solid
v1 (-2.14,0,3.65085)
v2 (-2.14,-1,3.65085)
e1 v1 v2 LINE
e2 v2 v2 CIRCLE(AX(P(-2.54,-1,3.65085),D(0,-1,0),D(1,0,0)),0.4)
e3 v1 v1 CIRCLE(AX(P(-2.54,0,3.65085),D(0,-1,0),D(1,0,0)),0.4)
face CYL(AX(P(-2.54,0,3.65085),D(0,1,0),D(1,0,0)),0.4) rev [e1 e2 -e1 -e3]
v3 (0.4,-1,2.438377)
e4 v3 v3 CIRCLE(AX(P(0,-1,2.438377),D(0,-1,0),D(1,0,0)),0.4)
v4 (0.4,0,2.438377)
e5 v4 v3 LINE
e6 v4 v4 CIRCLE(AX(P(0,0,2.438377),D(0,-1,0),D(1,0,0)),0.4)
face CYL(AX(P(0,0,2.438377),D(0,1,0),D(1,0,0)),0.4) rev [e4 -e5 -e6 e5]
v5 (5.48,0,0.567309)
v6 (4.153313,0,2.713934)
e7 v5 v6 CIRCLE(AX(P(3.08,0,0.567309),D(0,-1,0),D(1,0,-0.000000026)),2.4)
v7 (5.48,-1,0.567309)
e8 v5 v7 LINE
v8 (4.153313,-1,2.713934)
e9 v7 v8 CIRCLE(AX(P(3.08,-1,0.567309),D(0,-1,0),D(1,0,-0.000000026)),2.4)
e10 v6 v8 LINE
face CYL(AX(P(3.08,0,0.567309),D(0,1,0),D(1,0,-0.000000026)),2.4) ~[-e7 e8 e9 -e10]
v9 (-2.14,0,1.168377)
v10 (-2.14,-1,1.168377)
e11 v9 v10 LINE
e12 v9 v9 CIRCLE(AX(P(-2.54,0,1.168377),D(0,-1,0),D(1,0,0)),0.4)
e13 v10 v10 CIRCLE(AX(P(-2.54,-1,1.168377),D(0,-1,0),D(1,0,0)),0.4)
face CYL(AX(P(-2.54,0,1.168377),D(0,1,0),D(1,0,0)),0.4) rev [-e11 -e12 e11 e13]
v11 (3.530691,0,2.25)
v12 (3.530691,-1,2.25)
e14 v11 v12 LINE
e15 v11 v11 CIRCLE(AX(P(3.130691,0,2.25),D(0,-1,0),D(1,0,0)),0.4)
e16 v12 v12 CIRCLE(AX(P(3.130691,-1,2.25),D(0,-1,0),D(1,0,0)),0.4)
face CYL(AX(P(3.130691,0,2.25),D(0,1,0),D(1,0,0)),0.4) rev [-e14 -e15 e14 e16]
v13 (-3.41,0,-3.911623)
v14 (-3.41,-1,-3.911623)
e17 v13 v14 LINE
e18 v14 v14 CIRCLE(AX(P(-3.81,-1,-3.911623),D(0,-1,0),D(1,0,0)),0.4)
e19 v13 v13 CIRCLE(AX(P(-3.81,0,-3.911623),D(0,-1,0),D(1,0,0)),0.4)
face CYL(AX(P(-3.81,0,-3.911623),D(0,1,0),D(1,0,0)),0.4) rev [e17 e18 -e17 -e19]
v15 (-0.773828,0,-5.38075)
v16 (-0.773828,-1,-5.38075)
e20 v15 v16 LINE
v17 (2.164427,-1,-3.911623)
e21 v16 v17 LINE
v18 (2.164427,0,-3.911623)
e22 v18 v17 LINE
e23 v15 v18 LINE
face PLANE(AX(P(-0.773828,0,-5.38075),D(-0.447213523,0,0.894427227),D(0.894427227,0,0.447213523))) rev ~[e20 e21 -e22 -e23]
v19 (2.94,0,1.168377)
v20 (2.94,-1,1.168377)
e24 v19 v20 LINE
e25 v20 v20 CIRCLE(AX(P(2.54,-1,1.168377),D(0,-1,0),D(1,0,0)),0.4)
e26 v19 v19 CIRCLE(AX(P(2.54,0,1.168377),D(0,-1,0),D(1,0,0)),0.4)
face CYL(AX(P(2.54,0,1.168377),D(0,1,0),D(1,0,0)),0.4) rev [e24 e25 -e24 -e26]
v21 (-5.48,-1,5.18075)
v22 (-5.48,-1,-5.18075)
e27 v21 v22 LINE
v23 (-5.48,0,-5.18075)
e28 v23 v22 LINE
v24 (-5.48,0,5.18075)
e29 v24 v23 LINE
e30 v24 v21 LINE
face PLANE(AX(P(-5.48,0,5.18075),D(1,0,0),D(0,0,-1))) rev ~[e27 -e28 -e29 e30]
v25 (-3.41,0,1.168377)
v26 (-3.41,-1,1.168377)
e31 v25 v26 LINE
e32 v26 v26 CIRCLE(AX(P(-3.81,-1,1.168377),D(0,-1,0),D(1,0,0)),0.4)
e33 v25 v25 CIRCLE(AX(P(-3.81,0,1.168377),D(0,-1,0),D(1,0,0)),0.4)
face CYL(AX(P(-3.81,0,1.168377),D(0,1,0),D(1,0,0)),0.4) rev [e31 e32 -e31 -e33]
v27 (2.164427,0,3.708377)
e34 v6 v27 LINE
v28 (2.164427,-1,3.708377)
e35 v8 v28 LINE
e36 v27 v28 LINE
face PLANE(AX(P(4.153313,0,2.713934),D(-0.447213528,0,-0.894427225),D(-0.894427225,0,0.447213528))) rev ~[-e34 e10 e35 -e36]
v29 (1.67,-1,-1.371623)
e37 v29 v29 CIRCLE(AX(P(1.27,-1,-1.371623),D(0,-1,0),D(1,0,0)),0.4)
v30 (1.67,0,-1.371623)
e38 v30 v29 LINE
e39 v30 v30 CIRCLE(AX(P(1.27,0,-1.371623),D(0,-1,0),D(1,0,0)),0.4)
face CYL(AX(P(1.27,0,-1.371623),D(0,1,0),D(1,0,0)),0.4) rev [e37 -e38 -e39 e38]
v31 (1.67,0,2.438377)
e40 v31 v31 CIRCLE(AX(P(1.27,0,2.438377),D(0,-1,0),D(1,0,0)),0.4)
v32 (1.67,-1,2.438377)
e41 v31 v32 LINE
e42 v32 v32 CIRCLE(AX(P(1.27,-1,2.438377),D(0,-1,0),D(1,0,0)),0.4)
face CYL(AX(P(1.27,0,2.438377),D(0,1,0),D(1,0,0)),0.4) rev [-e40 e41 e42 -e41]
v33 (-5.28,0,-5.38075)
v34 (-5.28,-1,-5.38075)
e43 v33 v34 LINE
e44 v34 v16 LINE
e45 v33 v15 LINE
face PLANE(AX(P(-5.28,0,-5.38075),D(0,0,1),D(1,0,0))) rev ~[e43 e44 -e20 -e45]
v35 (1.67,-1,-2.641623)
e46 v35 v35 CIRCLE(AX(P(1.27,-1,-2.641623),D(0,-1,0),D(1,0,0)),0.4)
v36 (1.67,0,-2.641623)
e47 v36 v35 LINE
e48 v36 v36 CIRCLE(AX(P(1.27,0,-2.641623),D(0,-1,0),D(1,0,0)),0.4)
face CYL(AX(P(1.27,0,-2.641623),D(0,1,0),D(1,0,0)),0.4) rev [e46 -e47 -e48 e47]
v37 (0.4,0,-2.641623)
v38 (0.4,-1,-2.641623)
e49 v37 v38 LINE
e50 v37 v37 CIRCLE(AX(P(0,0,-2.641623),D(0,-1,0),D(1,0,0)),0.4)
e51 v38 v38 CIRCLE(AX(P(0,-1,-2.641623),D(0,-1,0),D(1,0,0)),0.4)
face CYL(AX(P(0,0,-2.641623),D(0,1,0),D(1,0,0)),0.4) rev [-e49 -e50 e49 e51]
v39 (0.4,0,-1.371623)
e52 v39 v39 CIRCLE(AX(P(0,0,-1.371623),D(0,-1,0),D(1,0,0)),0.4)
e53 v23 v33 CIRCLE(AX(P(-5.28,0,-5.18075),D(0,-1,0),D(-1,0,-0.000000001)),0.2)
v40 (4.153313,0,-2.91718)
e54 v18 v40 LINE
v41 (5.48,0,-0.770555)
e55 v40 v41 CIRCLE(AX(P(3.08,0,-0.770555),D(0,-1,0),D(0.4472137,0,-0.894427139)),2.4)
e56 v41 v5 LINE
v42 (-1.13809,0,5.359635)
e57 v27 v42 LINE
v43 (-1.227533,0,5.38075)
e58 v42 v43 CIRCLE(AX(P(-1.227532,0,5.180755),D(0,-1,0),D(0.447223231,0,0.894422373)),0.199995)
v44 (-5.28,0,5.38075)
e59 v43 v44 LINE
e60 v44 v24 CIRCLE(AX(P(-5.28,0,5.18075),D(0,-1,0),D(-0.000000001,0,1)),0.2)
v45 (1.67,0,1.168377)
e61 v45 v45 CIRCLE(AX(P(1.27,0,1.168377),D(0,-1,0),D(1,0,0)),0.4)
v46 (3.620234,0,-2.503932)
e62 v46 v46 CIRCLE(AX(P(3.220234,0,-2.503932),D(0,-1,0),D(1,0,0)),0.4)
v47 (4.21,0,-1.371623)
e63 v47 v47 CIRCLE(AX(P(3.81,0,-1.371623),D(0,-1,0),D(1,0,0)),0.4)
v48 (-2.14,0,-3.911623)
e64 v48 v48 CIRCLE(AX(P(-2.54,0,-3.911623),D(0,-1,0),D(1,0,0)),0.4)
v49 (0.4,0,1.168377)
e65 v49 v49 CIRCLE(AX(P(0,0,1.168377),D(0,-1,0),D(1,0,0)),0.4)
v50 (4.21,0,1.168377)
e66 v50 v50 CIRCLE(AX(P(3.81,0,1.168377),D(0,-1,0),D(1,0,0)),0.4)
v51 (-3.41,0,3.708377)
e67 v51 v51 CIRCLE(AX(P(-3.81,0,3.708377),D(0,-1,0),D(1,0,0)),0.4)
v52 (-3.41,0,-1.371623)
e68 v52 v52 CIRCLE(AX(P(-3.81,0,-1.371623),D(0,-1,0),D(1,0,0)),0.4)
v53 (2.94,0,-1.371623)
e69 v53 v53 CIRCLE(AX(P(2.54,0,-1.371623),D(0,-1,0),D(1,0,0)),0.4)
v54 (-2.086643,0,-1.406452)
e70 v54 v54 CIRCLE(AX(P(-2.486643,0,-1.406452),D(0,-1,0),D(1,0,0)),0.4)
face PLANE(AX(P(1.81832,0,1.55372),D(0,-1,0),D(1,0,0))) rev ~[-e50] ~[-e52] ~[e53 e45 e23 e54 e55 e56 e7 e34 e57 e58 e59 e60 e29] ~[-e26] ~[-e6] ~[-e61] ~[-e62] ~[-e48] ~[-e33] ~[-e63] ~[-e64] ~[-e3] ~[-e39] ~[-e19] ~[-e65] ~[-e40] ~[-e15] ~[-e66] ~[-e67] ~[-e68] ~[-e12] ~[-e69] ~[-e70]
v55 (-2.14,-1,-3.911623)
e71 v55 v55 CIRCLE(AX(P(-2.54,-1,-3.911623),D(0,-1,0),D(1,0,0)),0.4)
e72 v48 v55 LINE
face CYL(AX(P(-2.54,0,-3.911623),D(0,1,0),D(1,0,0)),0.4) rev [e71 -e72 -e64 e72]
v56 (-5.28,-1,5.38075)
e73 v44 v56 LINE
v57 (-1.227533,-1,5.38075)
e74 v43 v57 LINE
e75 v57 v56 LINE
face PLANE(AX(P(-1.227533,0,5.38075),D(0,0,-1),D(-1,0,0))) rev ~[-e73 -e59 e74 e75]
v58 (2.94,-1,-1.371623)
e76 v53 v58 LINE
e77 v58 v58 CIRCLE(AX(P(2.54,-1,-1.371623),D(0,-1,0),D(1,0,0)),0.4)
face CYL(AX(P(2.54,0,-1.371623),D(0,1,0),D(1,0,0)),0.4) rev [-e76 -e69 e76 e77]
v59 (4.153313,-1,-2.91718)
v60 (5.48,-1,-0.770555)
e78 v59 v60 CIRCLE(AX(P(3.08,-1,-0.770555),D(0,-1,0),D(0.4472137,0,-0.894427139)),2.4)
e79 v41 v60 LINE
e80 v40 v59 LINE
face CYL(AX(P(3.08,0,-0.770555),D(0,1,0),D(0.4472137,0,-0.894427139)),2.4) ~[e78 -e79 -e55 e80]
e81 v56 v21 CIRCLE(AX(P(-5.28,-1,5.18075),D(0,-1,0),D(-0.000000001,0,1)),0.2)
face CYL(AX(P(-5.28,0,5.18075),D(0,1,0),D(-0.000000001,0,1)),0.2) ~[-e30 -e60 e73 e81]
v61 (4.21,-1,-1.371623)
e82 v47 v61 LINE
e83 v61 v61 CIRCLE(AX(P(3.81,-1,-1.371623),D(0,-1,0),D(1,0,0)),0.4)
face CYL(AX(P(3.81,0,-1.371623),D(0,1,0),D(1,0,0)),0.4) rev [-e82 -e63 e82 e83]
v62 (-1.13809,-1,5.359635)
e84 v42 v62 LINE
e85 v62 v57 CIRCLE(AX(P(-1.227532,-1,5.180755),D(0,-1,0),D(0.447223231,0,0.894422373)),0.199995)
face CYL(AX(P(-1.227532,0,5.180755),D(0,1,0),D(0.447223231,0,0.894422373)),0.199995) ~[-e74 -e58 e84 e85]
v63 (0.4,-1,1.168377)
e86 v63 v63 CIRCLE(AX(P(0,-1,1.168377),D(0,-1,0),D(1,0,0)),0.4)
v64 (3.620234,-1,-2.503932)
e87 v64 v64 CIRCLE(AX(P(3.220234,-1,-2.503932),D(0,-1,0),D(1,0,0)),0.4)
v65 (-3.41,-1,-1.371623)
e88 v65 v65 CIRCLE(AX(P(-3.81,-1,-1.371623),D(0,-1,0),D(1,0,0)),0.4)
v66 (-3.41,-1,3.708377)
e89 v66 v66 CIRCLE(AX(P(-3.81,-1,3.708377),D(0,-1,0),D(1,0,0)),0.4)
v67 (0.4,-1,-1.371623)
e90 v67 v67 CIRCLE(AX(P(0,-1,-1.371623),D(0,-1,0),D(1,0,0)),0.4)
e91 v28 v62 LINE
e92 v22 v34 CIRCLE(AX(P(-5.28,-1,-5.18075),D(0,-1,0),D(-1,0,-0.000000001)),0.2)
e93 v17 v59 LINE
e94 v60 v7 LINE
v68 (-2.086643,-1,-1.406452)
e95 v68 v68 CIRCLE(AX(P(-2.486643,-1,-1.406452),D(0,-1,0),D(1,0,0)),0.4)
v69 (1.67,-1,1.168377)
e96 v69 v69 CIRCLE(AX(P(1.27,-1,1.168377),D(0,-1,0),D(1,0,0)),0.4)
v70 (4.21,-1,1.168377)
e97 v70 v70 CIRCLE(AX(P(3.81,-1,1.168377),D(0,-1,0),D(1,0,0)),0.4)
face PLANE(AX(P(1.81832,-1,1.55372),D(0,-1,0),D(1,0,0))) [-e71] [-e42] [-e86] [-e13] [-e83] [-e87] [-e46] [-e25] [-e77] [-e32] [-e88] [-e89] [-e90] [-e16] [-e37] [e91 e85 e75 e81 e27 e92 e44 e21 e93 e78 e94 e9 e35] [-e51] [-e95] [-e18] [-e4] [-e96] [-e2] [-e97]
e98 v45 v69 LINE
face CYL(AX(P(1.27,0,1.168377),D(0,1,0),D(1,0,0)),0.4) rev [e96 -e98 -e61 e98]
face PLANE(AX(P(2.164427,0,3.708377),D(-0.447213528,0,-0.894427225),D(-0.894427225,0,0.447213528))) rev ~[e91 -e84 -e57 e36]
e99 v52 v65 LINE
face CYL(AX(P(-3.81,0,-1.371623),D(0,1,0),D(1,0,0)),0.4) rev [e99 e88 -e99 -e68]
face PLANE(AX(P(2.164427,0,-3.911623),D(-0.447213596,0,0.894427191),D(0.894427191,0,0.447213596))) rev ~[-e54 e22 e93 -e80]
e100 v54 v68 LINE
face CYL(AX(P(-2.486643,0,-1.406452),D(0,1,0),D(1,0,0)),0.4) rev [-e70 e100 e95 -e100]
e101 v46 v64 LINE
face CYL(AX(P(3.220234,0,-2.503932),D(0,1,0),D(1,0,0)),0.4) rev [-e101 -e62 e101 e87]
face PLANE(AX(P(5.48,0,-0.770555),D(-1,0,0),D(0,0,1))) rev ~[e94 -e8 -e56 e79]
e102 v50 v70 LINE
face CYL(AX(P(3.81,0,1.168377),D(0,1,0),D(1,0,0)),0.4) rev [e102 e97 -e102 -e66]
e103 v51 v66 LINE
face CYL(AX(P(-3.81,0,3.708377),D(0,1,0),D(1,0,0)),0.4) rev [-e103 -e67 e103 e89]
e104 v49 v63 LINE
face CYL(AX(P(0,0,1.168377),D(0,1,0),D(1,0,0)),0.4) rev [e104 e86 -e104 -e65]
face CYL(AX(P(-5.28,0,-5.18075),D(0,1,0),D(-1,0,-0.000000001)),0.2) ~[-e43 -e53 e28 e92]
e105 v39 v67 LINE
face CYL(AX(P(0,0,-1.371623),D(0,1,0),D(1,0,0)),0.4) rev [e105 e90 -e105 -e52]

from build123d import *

# Parameters (mm, degrees)
F0_R     = 0.4
F0_W     = 4.21
F0_H     = 2.54
F1_DEPTH = 1


# Not quite as in the source:
# - ends of sketch curves that miss each other by under 0.0002 mm in the source are joined


with BuildPart() as f1:
    # F0 (on Front) → F1 (new body)
    with BuildSketch(Plane.XZ):
        with BuildLine():
            Line((4.153313, 2.713934), (2.1644269248, 3.7083768497))
            Line((2.1644269248, 3.7083768497), (-0.77, 3.708377))
            ThreePointArc((-0.77, 3.708377), (-1.1235533906, 3.5619303906), (-1.27, 3.208377))
            Line((-1.27, 3.208377), (-1.27, 2.438377))
            Line((-1.27, 2.438377), (-1.27, -0.101623))
            Line((-1.27, -0.101623), (5.48, -0.101623))
            Line((5.48, -0.101623), (5.48, 0.567309))
            ThreePointArc((5.48, 0.567309), (5.1215620576, 1.8290634789), (4.153313, 2.713934))
        make_face()
        with Locations((0, 1.168377)):
            Circle(F0_R, mode=Mode.SUBTRACT)
        with Locations((1.27, 1.168377)):
            Circle(F0_R, mode=Mode.SUBTRACT)
        with Locations((2.54, 1.168377)):
            Circle(F0_R, mode=Mode.SUBTRACT)
        with Locations((0, 2.438377)):
            Circle(F0_R, mode=Mode.SUBTRACT)
        with Locations((1.27, 2.438377)):
            Circle(F0_R, mode=Mode.SUBTRACT)
        with Locations((3.81, 1.168377)):
            Circle(F0_R, mode=Mode.SUBTRACT)
        with Locations((3.130691, 2.25)):
            Circle(F0_R, mode=Mode.SUBTRACT)
        with BuildLine():
            Line((2.1644269248, 3.7083768497), (-1.13809, 5.359635))
            ThreePointArc((-1.13809, 5.359635), (-1.1815821983, 5.3753997465), (-1.227533, 5.38075))
            Line((-1.227533, 5.38075), (-5.28, 5.38075))
            ThreePointArc((-5.28, 5.38075), (-5.4214213562, 5.3221713562), (-5.48, 5.18075))
            Line((-5.48, 5.18075), (-5.48, 2.438377))
            Line((-5.48, 2.438377), (-1.27, 2.438377))
            Line((-1.27, 2.438377), (-1.27, 3.208377))
            ThreePointArc((-1.27, 3.208377), (-1.1235533906, 3.5619303906), (-0.77, 3.708377))
            Line((-0.77, 3.708377), (2.1644269248, 3.7083768497))
        make_face()
        with Locations((-3.81, 3.708377)):
            Circle(F0_R, mode=Mode.SUBTRACT)
        with Locations((-2.54, 3.65085)):
            Circle(F0_R, mode=Mode.SUBTRACT)
        with Locations((-3.375, 1.168377)):
            Rectangle(F0_W, F0_H)
        with Locations((-3.81, 1.168377)):
            Circle(F0_R, mode=Mode.SUBTRACT)
        with Locations((-2.54, 1.168377)):
            Circle(F0_R, mode=Mode.SUBTRACT)
        with Locations((-3.375, -1.371623)):
            Rectangle(F0_W, F0_H)
        with Locations((-3.81, -1.371623)):
            Circle(F0_R, mode=Mode.SUBTRACT)
        with Locations((-2.486643, -1.406452)):
            Circle(F0_R, mode=Mode.SUBTRACT)
        with BuildLine():
            Line((-1.27, -3.411623), (-1.27, -2.641623))
            Line((-1.27, -2.641623), (-5.48, -2.641623))
            Line((-5.48, -2.641623), (-5.48, -5.18075))
            ThreePointArc((-5.48, -5.18075), (-5.4214213562, -5.3221713562), (-5.28, -5.38075))
            Line((-5.28, -5.38075), (-0.773828, -5.38075))
            Line((-0.773828, -5.38075), (2.1644269193, -3.9116228385))
            Line((2.1644269193, -3.9116228385), (-0.77, -3.911623))
            ThreePointArc((-0.77, -3.911623), (-1.1235533906, -3.7651763906), (-1.27, -3.411623))
        make_face()
        with Locations((-3.81, -3.911623)):
            Circle(F0_R, mode=Mode.SUBTRACT)
        with Locations((-2.54, -3.911623)):
            Circle(F0_R, mode=Mode.SUBTRACT)
        with BuildLine():
            Line((5.48, -0.770555), (5.48, -0.101623))
            Line((5.48, -0.101623), (-1.27, -0.101623))
            Line((-1.27, -0.101623), (-1.27, -2.641623))
            Line((-1.27, -2.641623), (-1.27, -3.411623))
            ThreePointArc((-1.27, -3.411623), (-1.1235533906, -3.7651763906), (-0.77, -3.911623))
            Line((-0.77, -3.911623), (2.164427, -3.911623))
            Line((2.164427, -3.911623), (4.153313, -2.91718))
            ThreePointArc((4.153313, -2.91718), (5.1215620576, -2.0323094789), (5.48, -0.770555))
        make_face()
        with Locations((0, -2.641623)):
            Circle(F0_R, mode=Mode.SUBTRACT)
        with Locations((1.27, -2.641623)):
            Circle(F0_R, mode=Mode.SUBTRACT)
        with Locations((0, -1.371623)):
            Circle(F0_R, mode=Mode.SUBTRACT)
        with Locations((1.27, -1.371623)):
            Circle(F0_R, mode=Mode.SUBTRACT)
        with Locations((2.54, -1.371623)):
            Circle(F0_R, mode=Mode.SUBTRACT)
        with Locations((3.220234, -2.503932)):
            Circle(F0_R, mode=Mode.SUBTRACT)
        with Locations((3.81, -1.371623)):
            Circle(F0_R, mode=Mode.SUBTRACT)
    extrude(amount=F1_DEPTH)


solid = f1.part
